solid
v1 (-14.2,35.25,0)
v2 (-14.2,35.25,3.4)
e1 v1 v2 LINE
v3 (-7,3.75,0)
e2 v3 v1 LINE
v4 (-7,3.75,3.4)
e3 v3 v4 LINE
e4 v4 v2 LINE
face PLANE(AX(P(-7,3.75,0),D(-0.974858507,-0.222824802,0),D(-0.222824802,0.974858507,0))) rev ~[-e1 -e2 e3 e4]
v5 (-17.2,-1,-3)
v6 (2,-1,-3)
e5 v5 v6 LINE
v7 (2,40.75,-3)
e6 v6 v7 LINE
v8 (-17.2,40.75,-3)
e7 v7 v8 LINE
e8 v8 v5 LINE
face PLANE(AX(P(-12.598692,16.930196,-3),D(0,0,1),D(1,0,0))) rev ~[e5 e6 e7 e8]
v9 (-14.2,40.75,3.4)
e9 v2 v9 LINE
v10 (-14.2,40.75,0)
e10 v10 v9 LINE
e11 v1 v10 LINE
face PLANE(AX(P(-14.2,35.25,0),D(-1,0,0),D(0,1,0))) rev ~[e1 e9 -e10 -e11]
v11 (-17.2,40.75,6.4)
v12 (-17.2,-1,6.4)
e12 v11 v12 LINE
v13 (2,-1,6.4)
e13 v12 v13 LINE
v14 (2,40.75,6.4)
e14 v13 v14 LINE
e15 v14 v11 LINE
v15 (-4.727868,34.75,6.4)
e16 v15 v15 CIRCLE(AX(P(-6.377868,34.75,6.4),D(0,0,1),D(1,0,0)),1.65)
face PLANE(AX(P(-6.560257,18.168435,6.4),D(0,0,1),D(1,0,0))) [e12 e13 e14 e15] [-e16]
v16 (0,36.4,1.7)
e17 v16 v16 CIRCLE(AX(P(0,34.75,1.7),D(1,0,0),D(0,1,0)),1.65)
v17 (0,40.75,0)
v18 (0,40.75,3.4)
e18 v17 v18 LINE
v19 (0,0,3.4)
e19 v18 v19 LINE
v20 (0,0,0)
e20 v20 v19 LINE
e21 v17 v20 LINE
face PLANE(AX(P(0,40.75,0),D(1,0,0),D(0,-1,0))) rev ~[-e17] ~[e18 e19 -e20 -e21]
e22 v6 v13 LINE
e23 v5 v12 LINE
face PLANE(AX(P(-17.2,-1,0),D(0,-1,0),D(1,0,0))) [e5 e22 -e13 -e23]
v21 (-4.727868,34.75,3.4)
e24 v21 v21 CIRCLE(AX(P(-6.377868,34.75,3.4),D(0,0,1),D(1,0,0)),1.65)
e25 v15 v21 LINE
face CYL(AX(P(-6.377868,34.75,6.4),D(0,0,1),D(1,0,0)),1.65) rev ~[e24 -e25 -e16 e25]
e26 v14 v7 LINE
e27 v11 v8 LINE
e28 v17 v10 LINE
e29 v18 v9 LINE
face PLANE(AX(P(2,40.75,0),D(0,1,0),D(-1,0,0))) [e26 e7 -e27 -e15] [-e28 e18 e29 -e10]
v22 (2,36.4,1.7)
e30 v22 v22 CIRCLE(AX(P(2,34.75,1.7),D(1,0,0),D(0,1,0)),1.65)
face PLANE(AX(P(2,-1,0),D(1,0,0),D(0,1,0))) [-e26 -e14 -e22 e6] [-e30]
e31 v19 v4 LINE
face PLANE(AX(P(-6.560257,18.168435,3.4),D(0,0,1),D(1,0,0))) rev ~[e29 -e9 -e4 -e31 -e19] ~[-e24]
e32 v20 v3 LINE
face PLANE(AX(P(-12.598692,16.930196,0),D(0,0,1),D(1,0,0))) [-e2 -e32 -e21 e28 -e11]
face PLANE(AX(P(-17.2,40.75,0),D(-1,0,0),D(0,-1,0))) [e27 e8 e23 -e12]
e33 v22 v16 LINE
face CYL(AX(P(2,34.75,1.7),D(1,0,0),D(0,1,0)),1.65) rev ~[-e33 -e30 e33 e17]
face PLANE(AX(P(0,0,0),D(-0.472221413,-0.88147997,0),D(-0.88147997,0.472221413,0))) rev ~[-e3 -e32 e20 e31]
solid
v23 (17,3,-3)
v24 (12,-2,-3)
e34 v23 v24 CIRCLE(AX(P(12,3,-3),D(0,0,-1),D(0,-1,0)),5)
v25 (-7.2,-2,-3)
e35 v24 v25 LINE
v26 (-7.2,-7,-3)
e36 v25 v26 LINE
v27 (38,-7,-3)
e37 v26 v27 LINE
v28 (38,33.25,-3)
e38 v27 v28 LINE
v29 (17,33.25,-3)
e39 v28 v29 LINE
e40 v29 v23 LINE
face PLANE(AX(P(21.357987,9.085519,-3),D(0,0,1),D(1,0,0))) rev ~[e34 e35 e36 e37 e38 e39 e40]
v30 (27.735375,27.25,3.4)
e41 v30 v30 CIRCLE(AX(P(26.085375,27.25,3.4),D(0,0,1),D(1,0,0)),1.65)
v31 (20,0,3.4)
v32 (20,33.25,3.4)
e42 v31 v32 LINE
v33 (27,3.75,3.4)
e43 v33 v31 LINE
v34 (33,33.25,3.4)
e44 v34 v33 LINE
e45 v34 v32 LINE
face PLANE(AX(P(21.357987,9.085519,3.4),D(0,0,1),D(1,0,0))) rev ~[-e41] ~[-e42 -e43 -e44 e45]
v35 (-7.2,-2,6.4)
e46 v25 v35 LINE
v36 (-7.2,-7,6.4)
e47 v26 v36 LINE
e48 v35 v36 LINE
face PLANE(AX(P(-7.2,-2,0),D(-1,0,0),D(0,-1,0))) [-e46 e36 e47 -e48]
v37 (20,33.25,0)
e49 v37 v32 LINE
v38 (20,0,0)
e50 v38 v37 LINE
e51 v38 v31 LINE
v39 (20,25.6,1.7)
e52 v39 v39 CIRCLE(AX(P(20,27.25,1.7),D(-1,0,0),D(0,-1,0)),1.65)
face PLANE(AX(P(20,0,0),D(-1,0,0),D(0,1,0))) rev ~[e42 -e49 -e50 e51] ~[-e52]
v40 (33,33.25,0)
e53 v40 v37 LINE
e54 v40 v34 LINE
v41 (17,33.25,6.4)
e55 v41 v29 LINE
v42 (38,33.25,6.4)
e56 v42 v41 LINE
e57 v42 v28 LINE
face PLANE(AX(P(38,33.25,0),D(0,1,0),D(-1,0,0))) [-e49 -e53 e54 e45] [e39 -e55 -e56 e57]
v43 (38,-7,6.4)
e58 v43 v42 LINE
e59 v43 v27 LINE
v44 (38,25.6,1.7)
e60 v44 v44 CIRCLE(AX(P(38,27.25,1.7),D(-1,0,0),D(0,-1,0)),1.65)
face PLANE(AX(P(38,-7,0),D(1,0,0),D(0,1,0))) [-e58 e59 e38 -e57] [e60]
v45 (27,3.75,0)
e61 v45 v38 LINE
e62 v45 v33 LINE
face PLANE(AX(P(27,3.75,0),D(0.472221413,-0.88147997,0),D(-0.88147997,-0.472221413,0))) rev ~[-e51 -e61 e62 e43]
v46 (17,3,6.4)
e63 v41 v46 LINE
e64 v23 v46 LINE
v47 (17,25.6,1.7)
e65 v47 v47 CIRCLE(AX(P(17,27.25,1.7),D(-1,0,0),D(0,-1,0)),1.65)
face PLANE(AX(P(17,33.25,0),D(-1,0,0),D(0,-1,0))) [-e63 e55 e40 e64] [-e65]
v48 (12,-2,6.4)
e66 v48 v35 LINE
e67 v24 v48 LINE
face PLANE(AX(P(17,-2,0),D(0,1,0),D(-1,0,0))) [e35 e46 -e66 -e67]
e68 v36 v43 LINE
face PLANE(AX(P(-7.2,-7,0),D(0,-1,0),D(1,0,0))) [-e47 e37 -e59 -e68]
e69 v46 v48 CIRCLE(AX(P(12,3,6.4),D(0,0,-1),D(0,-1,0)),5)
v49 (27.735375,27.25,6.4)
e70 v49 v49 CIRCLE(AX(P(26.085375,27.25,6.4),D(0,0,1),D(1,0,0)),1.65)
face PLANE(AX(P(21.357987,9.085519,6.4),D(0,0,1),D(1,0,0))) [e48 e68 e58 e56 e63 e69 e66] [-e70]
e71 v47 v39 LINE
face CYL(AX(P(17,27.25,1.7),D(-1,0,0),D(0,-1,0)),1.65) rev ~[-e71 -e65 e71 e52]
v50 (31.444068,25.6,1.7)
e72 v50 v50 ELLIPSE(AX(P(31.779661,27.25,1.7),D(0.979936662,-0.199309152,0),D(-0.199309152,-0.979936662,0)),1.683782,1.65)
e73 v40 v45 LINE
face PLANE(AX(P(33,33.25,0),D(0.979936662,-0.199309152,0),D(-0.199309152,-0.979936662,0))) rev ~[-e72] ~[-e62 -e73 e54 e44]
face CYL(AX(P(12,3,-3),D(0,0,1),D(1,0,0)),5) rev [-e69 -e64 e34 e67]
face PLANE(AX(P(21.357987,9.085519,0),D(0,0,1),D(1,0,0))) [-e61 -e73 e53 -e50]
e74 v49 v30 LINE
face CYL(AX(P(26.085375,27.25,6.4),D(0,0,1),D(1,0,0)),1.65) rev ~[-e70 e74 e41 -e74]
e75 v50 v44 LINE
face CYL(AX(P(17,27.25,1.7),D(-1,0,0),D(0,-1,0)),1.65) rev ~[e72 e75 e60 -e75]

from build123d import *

# Parameters (mm, degrees)
F1_DEPTH  = 3.4
F3_DEPTH  = 3
F4_DEPTH  = 3
F5_DEPTH  = 3
F6_R      = 1.65
F7_DEPTH  = 3
F8_R      = 1.65
F9_DEPTH  = 2
F10_R     = 1.65
F11_DEPTH = 21.001
F12_R     = 5


# Not quite as in the source:
# - a feature names something its author has since deleted; it is built from what else it names


with BuildPart() as f1:
    # F0 (on Top) → F1 (new body)
    with BuildSketch(Plane.XY):
        Polygon((-17.2, 0), (0, 0), (-7, 3.75), (-14.2, 35.25), (-14.2, 40.75), (-17.2, 40.75), align=None)
        Polygon((0, 40.75), (0, 0), (-17.2, 0), (-17.2, -1), (2, -1), (2, 0), (2, 40.75), align=None)
    extrude(amount=F1_DEPTH)

    # F2 (on face) → F3 (join)
    with BuildSketch(Plane.XY.offset(3.4)):
        Polygon((0, 40.75), (0, 0), (-7, 3.75), (-14.2, 35.25), (-14.2, 40.75), (-17.2, 40.75), (-17.2, -1), (2, -1), (2, 0), (2, 40.75), align=None)
        Polygon((-7, 3.75), (0, 0), (0, 40.75), (-14.2, 40.75), (-14.2, 35.25), align=None)
    extrude(amount=F3_DEPTH)

    # F0 (on Top) → F4 (join)
    with BuildSketch(Plane.XY):
        Polygon((-17.2, 0), (0, 0), (-7, 3.75), (-14.2, 35.25), (-14.2, 40.75), (-17.2, 40.75), align=None)
        Polygon((-7, 3.75), (0, 0), (0, 40.75), (-14.2, 40.75), (-14.2, 35.25), align=None)
        Polygon((0, 40.75), (0, 0), (-17.2, 0), (-17.2, -1), (2, -1), (2, 0), (2, 40.75), align=None)
    extrude(amount=-F4_DEPTH)


with BuildPart() as f1b:
    # F0 (on Top) → F1, piece 2 (new body)
    with BuildSketch(Plane.XY):
        Polygon((20, 33.25), (17, 33.25), (17, 0), (17, -2), (-7.2, -2), (-7.2, -7), (38, -7), (38, 33.25), (33, 33.25), (27, 3.75), (20, 0), align=None)
    extrude(amount=F1_DEPTH)

    # F2 (on face) → F3, piece 2 (join)
    with BuildSketch(Plane.XY.offset(3.4)):
        Polygon((27, 3.75), (20, 0), (20, 33.25), (17, 33.25), (17, -2), (-7.2, -2), (-7.2, -7), (38, -7), (38, 33.25), (33, 33.25), align=None)
        Polygon((20, 33.25), (20, 0), (27, 3.75), (33, 33.25), align=None)
    extrude(amount=F3_DEPTH)

    # F0 (on Top) → F5 (join)
    with BuildSketch(Plane.XY):
        Polygon((20, 33.25), (17, 33.25), (17, 0), (17, -2), (-7.2, -2), (-7.2, -7), (38, -7), (38, 33.25), (33, 33.25), (27, 3.75), (20, 0), align=None)
        Polygon((33, 33.25), (20, 33.25), (20, 0), (27, 3.75), align=None)
    extrude(amount=-F5_DEPTH)


with BuildPart() as f7_tool:
    # F6 (on face) → F7 (new body, through all)
    with BuildSketch(Plane.XY.offset(6.4)):
        with Locations((-6.3778683543, 34.75)):
            Circle(F6_R)
        with Locations((26.0853748769, 27.25)):
            Circle(F6_R)
    extrude(amount=-F7_DEPTH)


with BuildPart() as f1_1:
    add(f1.part)

    # F7: cut by f7_tool
    add(f7_tool.part, mode=Mode.SUBTRACT)

    # F8 (on face) → F9 (cut, through all)
    with BuildSketch(Plane.YZ.offset(2)):
        with Locations((34.75, 1.7)):
            Circle(F8_R)
    extrude(amount=-F9_DEPTH, mode=Mode.SUBTRACT)


with BuildPart() as f1b_1:
    add(f1b.part)

    # F7: cut by f7_tool
    add(f7_tool.part, mode=Mode.SUBTRACT)

    # F10 (on face) → F11 (cut, through all)
    with BuildSketch(Plane(origin=(17, 0, 0), x_dir=(0, -1, 0), z_dir=(-1, 0, 0))):
        with Locations((-27.25, 1.7)):
            Circle(F10_R)
    extrude(amount=-F11_DEPTH, mode=Mode.SUBTRACT)

    # F12
    f12_edges = [f1b_1.edges().sort_by_distance(p)[0] for p in [
        (17, -2, 1.7),
    ]]
    fillet(f12_edges, radius=F12_R)


solid = Compound([f1_1.part, f1b_1.part])
